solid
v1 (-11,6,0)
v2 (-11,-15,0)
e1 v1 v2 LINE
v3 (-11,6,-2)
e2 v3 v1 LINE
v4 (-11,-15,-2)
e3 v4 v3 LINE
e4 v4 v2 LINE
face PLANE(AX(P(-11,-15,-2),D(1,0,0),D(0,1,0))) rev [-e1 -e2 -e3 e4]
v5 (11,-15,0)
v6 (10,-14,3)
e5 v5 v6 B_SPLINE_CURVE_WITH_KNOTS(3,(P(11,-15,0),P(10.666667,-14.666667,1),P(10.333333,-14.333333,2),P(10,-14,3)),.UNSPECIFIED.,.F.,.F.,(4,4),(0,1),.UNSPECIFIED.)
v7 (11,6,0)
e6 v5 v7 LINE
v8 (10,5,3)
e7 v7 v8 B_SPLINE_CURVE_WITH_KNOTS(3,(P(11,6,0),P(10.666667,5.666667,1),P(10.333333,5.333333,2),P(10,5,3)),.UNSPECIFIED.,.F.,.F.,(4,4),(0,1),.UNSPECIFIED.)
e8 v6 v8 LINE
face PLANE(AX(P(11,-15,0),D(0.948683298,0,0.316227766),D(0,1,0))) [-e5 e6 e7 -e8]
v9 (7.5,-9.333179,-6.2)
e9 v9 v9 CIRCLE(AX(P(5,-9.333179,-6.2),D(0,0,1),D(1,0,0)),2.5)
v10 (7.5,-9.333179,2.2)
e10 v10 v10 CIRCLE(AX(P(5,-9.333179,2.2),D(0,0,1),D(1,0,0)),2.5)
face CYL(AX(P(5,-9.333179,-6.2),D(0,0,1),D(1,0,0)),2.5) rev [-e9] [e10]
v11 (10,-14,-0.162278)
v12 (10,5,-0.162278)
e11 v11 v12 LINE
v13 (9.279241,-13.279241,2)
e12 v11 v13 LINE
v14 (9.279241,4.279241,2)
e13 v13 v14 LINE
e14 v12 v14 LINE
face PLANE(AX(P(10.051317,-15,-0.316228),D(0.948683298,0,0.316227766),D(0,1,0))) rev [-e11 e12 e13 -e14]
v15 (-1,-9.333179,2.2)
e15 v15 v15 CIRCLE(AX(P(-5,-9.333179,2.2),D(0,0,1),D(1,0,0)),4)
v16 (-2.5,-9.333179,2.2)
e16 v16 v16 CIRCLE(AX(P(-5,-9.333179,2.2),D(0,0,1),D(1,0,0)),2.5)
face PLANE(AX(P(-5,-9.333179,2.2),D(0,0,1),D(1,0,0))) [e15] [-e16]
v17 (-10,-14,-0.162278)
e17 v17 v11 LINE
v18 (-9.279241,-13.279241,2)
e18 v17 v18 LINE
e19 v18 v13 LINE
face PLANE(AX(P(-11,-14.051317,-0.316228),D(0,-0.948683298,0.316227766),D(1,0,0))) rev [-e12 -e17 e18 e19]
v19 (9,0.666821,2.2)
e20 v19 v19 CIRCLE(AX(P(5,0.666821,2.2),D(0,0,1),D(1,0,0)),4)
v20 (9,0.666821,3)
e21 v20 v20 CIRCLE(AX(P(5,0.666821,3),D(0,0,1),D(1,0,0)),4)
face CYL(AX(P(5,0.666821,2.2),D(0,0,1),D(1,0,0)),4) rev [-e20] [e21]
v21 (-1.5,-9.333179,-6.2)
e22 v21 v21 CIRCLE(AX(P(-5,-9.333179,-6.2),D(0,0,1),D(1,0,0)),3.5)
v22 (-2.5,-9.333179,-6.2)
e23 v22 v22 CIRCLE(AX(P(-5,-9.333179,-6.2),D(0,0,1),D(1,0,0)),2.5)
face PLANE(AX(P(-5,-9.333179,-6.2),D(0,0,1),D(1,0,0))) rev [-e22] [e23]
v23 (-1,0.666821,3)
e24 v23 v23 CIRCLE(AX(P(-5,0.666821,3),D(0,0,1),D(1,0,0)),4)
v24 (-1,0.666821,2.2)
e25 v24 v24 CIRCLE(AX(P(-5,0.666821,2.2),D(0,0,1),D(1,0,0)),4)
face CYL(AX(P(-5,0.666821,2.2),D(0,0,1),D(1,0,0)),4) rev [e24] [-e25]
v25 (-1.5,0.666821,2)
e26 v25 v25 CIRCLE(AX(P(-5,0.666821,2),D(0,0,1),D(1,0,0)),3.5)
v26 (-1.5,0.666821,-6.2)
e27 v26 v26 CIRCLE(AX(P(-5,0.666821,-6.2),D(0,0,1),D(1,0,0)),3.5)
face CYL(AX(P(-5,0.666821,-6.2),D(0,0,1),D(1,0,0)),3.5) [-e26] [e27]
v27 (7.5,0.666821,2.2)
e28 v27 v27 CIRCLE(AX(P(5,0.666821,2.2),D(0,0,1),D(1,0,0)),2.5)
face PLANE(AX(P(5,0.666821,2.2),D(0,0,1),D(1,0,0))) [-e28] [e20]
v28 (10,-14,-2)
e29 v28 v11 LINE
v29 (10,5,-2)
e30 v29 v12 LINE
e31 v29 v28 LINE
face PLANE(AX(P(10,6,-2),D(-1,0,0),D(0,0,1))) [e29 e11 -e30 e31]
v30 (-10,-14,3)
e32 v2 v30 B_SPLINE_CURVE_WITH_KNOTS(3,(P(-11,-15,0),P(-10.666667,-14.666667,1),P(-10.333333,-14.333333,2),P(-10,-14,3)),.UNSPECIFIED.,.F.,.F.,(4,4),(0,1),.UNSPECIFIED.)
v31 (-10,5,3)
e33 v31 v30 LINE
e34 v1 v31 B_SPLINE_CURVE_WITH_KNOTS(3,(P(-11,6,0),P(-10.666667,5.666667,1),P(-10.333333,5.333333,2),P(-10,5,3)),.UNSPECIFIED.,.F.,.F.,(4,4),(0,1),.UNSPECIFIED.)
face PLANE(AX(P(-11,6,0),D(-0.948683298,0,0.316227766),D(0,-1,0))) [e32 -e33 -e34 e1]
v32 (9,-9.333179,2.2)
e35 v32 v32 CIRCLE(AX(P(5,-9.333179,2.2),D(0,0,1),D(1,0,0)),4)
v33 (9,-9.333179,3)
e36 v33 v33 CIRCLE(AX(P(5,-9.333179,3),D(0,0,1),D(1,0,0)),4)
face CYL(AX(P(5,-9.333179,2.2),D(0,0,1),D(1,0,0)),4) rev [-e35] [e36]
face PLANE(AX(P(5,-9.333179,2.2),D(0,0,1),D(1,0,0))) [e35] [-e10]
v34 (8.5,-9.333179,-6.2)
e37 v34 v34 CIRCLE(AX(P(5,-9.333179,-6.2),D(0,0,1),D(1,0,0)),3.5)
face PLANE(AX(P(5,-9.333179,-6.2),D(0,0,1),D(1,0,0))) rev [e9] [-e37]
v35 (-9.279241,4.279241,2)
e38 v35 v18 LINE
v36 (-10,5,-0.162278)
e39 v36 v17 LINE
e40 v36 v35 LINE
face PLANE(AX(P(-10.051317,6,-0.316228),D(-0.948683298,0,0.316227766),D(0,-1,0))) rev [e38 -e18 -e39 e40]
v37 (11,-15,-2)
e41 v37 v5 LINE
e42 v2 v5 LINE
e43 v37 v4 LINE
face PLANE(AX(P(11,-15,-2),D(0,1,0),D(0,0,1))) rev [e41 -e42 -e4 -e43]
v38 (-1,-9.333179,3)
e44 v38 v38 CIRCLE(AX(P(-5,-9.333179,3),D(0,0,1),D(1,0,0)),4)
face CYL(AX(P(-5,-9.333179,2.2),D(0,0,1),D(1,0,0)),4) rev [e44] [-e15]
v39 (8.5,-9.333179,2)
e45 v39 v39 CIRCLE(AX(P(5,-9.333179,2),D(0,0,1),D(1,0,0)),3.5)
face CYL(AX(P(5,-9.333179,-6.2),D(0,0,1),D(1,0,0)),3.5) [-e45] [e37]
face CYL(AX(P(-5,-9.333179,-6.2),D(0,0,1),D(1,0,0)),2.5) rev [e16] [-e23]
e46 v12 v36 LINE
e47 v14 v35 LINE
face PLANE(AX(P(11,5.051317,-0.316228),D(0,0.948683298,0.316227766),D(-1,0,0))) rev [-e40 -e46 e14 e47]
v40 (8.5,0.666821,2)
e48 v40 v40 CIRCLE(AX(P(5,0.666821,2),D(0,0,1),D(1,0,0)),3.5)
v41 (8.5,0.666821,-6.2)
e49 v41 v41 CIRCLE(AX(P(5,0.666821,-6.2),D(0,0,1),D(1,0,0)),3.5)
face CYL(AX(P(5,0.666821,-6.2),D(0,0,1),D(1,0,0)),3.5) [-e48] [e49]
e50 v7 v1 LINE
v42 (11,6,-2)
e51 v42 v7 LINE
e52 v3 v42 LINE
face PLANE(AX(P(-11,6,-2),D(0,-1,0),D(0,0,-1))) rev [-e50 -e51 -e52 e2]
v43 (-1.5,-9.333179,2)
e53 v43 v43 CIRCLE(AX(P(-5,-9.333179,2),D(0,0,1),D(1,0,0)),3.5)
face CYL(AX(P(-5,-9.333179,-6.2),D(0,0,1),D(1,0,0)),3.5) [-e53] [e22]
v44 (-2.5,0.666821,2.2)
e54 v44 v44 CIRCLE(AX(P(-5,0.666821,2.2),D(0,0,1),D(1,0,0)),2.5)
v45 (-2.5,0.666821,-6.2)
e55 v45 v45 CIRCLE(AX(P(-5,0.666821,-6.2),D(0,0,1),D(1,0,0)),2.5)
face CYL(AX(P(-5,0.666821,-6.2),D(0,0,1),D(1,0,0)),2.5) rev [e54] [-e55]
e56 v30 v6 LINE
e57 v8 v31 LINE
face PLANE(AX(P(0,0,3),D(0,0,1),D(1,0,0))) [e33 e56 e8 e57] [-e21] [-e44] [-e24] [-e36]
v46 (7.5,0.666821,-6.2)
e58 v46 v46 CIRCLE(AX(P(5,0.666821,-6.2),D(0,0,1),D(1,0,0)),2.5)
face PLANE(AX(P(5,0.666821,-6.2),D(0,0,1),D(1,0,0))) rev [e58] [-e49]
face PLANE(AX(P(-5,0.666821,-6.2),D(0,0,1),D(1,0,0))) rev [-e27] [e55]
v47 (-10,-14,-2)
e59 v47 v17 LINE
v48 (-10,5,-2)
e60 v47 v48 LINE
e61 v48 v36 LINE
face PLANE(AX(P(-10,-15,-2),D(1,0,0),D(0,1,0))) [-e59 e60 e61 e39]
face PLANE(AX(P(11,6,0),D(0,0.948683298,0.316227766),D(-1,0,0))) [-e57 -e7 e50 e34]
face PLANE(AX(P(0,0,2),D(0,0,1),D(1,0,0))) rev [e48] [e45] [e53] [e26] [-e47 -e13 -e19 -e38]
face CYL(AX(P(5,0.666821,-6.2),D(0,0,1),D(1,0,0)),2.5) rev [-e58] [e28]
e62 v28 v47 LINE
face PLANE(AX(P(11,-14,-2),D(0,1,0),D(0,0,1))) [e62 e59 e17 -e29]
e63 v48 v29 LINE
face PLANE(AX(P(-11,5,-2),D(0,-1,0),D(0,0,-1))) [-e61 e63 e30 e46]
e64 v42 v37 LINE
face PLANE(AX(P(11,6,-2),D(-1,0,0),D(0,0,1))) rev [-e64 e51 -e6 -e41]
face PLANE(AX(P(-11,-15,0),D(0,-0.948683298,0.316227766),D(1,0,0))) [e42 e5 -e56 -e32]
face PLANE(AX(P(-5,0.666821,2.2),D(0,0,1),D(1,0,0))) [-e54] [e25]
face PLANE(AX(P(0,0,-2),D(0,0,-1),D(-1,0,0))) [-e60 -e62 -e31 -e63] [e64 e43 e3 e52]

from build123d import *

# Parameters (mm, degrees)
LOFT6_OUTLINE_W     = 20
LOFT6_OUTLINE_H     = 19
LOFT6_DEPTH         = 3
LOFT6_DRAFT         = 18.4349488
SKETCH4_W           = 22
SKETCH4_H           = 21
BOSS_EXTRUDE1_DEPTH = 2
SHELL1_T            = -1
SKETCH5_R           = 3.5
SKETCH5_R_2         = 2.5
BOSS_EXTRUDE2_DEPTH = 9.2
SKETCH5_2_R         = 2.5
CUT_EXTRUDE1_DEPTH  = 9.2
SKETCH6_R           = 4
SKETCH6_R_2         = 2.5
CUT_EXTRUDE3_DEPTH  = 0.8


# Read off the part's stored shape, not the designer's step: Loft6
with BuildPart() as part:
    # Loft6 outline → Loft6 (with draft: the straight prism first)
    with BuildSketch(Plane.XY.offset(3)):
        with Locations((0, -4.5)):
            Rectangle(LOFT6_OUTLINE_W, LOFT6_OUTLINE_H)
    extrude(amount=-LOFT6_DEPTH)
    # Loft6: the draft: its side faces are tilted about the plane it starts from
    loft6_sides = [part.faces().sort_by_distance(p)[0] for p in [
        (10, -4.5, 1.5),
        (0, 5, 1.5),
        (-10, -4.5, 1.5),
        (0, -14, 1.5),
    ]]
    draft(loft6_sides, Plane.XY.offset(3), LOFT6_DRAFT)

    # Sketch4 → Boss-Extrude1 (add)
    with BuildSketch(Plane(origin=(0, 0, 0), x_dir=(-1, 0, 0), z_dir=(0, 0, -1))):
        with Locations((0, -4.5)):
            Rectangle(SKETCH4_W, SKETCH4_H)
    extrude(amount=BOSS_EXTRUDE1_DEPTH)

    # Shell1
    shell1_openings = [part.faces().sort_by_distance(p)[0] for p in [
        (0, -4.5, -2),
    ]]
    offset(amount=SHELL1_T, openings=shell1_openings, kind=Kind.INTERSECTION)

    # Sketch5 → Boss-Extrude2 (add)
    # profile 1 of 4: a face of its own
    with BuildSketch(Plane.XY.offset(3)):
        with Locations((-5, 0.666820713)):
            Circle(SKETCH5_R)
        with Locations((-5, 0.666820713)):
            Circle(SKETCH5_R_2, mode=Mode.SUBTRACT)
    # profile 2 of 4: a face of its own
    with BuildSketch(Plane.XY.offset(3)):
        with Locations((5, 0.666820713)):
            Circle(SKETCH5_R)
        with Locations((5, 0.666820713)):
            Circle(SKETCH5_R_2, mode=Mode.SUBTRACT)
    # profile 3 of 4: a face of its own
    with BuildSketch(Plane.XY.offset(3)):
        with Locations((-5, -9.333179287)):
            Circle(SKETCH5_R)
        with Locations((-5, -9.333179287)):
            Circle(SKETCH5_R_2, mode=Mode.SUBTRACT)
    # profile 4 of 4: a face of its own
    with BuildSketch(Plane.XY.offset(3)):
        with Locations((5, -9.333179287)):
            Circle(SKETCH5_R)
        with Locations((5, -9.333179287)):
            Circle(SKETCH5_R_2, mode=Mode.SUBTRACT)
    extrude(amount=-BOSS_EXTRUDE2_DEPTH)

    # Sketch5<2> → Cut-Extrude1 (cut)
    with BuildSketch(Plane.XY.offset(3)):
        with Locations((-5, 0.666820713)):
            Circle(SKETCH5_2_R)
        with Locations((5, 0.666820713)):
            Circle(SKETCH5_2_R)
        with Locations((5, -9.333179287)):
            Circle(SKETCH5_2_R)
        with Locations((-5, -9.333179287)):
            Circle(SKETCH5_2_R)
    extrude(amount=-CUT_EXTRUDE1_DEPTH, mode=Mode.SUBTRACT)

    # Sketch6 → Cut-Extrude3 (cut)
    # profile 1 of 4: a face of its own
    with BuildSketch(Plane.XY.offset(3)):
        with Locations((-5, 0.666820713)):
            Circle(SKETCH6_R)
        with Locations((-5, 0.666820713)):
            Circle(SKETCH6_R_2, mode=Mode.SUBTRACT)
    # profile 2 of 4: a face of its own
    with BuildSketch(Plane.XY.offset(3)):
        with Locations((5, 0.666820713)):
            Circle(SKETCH6_R)
        with Locations((5, 0.666820713)):
            Circle(SKETCH6_R_2, mode=Mode.SUBTRACT)
    # profile 3 of 4: a face of its own
    with BuildSketch(Plane.XY.offset(3)):
        with Locations((5, -9.333179287)):
            Circle(SKETCH6_R)
        with Locations((5, -9.333179287)):
            Circle(SKETCH6_R_2, mode=Mode.SUBTRACT)
    # profile 4 of 4: a face of its own
    with BuildSketch(Plane.XY.offset(3)):
        with Locations((-5, -9.333179287)):
            Circle(SKETCH6_R)
        with Locations((-5, -9.333179287)):
            Circle(SKETCH6_R_2, mode=Mode.SUBTRACT)
    extrude(amount=-CUT_EXTRUDE3_DEPTH, mode=Mode.SUBTRACT)


solid = part.part
